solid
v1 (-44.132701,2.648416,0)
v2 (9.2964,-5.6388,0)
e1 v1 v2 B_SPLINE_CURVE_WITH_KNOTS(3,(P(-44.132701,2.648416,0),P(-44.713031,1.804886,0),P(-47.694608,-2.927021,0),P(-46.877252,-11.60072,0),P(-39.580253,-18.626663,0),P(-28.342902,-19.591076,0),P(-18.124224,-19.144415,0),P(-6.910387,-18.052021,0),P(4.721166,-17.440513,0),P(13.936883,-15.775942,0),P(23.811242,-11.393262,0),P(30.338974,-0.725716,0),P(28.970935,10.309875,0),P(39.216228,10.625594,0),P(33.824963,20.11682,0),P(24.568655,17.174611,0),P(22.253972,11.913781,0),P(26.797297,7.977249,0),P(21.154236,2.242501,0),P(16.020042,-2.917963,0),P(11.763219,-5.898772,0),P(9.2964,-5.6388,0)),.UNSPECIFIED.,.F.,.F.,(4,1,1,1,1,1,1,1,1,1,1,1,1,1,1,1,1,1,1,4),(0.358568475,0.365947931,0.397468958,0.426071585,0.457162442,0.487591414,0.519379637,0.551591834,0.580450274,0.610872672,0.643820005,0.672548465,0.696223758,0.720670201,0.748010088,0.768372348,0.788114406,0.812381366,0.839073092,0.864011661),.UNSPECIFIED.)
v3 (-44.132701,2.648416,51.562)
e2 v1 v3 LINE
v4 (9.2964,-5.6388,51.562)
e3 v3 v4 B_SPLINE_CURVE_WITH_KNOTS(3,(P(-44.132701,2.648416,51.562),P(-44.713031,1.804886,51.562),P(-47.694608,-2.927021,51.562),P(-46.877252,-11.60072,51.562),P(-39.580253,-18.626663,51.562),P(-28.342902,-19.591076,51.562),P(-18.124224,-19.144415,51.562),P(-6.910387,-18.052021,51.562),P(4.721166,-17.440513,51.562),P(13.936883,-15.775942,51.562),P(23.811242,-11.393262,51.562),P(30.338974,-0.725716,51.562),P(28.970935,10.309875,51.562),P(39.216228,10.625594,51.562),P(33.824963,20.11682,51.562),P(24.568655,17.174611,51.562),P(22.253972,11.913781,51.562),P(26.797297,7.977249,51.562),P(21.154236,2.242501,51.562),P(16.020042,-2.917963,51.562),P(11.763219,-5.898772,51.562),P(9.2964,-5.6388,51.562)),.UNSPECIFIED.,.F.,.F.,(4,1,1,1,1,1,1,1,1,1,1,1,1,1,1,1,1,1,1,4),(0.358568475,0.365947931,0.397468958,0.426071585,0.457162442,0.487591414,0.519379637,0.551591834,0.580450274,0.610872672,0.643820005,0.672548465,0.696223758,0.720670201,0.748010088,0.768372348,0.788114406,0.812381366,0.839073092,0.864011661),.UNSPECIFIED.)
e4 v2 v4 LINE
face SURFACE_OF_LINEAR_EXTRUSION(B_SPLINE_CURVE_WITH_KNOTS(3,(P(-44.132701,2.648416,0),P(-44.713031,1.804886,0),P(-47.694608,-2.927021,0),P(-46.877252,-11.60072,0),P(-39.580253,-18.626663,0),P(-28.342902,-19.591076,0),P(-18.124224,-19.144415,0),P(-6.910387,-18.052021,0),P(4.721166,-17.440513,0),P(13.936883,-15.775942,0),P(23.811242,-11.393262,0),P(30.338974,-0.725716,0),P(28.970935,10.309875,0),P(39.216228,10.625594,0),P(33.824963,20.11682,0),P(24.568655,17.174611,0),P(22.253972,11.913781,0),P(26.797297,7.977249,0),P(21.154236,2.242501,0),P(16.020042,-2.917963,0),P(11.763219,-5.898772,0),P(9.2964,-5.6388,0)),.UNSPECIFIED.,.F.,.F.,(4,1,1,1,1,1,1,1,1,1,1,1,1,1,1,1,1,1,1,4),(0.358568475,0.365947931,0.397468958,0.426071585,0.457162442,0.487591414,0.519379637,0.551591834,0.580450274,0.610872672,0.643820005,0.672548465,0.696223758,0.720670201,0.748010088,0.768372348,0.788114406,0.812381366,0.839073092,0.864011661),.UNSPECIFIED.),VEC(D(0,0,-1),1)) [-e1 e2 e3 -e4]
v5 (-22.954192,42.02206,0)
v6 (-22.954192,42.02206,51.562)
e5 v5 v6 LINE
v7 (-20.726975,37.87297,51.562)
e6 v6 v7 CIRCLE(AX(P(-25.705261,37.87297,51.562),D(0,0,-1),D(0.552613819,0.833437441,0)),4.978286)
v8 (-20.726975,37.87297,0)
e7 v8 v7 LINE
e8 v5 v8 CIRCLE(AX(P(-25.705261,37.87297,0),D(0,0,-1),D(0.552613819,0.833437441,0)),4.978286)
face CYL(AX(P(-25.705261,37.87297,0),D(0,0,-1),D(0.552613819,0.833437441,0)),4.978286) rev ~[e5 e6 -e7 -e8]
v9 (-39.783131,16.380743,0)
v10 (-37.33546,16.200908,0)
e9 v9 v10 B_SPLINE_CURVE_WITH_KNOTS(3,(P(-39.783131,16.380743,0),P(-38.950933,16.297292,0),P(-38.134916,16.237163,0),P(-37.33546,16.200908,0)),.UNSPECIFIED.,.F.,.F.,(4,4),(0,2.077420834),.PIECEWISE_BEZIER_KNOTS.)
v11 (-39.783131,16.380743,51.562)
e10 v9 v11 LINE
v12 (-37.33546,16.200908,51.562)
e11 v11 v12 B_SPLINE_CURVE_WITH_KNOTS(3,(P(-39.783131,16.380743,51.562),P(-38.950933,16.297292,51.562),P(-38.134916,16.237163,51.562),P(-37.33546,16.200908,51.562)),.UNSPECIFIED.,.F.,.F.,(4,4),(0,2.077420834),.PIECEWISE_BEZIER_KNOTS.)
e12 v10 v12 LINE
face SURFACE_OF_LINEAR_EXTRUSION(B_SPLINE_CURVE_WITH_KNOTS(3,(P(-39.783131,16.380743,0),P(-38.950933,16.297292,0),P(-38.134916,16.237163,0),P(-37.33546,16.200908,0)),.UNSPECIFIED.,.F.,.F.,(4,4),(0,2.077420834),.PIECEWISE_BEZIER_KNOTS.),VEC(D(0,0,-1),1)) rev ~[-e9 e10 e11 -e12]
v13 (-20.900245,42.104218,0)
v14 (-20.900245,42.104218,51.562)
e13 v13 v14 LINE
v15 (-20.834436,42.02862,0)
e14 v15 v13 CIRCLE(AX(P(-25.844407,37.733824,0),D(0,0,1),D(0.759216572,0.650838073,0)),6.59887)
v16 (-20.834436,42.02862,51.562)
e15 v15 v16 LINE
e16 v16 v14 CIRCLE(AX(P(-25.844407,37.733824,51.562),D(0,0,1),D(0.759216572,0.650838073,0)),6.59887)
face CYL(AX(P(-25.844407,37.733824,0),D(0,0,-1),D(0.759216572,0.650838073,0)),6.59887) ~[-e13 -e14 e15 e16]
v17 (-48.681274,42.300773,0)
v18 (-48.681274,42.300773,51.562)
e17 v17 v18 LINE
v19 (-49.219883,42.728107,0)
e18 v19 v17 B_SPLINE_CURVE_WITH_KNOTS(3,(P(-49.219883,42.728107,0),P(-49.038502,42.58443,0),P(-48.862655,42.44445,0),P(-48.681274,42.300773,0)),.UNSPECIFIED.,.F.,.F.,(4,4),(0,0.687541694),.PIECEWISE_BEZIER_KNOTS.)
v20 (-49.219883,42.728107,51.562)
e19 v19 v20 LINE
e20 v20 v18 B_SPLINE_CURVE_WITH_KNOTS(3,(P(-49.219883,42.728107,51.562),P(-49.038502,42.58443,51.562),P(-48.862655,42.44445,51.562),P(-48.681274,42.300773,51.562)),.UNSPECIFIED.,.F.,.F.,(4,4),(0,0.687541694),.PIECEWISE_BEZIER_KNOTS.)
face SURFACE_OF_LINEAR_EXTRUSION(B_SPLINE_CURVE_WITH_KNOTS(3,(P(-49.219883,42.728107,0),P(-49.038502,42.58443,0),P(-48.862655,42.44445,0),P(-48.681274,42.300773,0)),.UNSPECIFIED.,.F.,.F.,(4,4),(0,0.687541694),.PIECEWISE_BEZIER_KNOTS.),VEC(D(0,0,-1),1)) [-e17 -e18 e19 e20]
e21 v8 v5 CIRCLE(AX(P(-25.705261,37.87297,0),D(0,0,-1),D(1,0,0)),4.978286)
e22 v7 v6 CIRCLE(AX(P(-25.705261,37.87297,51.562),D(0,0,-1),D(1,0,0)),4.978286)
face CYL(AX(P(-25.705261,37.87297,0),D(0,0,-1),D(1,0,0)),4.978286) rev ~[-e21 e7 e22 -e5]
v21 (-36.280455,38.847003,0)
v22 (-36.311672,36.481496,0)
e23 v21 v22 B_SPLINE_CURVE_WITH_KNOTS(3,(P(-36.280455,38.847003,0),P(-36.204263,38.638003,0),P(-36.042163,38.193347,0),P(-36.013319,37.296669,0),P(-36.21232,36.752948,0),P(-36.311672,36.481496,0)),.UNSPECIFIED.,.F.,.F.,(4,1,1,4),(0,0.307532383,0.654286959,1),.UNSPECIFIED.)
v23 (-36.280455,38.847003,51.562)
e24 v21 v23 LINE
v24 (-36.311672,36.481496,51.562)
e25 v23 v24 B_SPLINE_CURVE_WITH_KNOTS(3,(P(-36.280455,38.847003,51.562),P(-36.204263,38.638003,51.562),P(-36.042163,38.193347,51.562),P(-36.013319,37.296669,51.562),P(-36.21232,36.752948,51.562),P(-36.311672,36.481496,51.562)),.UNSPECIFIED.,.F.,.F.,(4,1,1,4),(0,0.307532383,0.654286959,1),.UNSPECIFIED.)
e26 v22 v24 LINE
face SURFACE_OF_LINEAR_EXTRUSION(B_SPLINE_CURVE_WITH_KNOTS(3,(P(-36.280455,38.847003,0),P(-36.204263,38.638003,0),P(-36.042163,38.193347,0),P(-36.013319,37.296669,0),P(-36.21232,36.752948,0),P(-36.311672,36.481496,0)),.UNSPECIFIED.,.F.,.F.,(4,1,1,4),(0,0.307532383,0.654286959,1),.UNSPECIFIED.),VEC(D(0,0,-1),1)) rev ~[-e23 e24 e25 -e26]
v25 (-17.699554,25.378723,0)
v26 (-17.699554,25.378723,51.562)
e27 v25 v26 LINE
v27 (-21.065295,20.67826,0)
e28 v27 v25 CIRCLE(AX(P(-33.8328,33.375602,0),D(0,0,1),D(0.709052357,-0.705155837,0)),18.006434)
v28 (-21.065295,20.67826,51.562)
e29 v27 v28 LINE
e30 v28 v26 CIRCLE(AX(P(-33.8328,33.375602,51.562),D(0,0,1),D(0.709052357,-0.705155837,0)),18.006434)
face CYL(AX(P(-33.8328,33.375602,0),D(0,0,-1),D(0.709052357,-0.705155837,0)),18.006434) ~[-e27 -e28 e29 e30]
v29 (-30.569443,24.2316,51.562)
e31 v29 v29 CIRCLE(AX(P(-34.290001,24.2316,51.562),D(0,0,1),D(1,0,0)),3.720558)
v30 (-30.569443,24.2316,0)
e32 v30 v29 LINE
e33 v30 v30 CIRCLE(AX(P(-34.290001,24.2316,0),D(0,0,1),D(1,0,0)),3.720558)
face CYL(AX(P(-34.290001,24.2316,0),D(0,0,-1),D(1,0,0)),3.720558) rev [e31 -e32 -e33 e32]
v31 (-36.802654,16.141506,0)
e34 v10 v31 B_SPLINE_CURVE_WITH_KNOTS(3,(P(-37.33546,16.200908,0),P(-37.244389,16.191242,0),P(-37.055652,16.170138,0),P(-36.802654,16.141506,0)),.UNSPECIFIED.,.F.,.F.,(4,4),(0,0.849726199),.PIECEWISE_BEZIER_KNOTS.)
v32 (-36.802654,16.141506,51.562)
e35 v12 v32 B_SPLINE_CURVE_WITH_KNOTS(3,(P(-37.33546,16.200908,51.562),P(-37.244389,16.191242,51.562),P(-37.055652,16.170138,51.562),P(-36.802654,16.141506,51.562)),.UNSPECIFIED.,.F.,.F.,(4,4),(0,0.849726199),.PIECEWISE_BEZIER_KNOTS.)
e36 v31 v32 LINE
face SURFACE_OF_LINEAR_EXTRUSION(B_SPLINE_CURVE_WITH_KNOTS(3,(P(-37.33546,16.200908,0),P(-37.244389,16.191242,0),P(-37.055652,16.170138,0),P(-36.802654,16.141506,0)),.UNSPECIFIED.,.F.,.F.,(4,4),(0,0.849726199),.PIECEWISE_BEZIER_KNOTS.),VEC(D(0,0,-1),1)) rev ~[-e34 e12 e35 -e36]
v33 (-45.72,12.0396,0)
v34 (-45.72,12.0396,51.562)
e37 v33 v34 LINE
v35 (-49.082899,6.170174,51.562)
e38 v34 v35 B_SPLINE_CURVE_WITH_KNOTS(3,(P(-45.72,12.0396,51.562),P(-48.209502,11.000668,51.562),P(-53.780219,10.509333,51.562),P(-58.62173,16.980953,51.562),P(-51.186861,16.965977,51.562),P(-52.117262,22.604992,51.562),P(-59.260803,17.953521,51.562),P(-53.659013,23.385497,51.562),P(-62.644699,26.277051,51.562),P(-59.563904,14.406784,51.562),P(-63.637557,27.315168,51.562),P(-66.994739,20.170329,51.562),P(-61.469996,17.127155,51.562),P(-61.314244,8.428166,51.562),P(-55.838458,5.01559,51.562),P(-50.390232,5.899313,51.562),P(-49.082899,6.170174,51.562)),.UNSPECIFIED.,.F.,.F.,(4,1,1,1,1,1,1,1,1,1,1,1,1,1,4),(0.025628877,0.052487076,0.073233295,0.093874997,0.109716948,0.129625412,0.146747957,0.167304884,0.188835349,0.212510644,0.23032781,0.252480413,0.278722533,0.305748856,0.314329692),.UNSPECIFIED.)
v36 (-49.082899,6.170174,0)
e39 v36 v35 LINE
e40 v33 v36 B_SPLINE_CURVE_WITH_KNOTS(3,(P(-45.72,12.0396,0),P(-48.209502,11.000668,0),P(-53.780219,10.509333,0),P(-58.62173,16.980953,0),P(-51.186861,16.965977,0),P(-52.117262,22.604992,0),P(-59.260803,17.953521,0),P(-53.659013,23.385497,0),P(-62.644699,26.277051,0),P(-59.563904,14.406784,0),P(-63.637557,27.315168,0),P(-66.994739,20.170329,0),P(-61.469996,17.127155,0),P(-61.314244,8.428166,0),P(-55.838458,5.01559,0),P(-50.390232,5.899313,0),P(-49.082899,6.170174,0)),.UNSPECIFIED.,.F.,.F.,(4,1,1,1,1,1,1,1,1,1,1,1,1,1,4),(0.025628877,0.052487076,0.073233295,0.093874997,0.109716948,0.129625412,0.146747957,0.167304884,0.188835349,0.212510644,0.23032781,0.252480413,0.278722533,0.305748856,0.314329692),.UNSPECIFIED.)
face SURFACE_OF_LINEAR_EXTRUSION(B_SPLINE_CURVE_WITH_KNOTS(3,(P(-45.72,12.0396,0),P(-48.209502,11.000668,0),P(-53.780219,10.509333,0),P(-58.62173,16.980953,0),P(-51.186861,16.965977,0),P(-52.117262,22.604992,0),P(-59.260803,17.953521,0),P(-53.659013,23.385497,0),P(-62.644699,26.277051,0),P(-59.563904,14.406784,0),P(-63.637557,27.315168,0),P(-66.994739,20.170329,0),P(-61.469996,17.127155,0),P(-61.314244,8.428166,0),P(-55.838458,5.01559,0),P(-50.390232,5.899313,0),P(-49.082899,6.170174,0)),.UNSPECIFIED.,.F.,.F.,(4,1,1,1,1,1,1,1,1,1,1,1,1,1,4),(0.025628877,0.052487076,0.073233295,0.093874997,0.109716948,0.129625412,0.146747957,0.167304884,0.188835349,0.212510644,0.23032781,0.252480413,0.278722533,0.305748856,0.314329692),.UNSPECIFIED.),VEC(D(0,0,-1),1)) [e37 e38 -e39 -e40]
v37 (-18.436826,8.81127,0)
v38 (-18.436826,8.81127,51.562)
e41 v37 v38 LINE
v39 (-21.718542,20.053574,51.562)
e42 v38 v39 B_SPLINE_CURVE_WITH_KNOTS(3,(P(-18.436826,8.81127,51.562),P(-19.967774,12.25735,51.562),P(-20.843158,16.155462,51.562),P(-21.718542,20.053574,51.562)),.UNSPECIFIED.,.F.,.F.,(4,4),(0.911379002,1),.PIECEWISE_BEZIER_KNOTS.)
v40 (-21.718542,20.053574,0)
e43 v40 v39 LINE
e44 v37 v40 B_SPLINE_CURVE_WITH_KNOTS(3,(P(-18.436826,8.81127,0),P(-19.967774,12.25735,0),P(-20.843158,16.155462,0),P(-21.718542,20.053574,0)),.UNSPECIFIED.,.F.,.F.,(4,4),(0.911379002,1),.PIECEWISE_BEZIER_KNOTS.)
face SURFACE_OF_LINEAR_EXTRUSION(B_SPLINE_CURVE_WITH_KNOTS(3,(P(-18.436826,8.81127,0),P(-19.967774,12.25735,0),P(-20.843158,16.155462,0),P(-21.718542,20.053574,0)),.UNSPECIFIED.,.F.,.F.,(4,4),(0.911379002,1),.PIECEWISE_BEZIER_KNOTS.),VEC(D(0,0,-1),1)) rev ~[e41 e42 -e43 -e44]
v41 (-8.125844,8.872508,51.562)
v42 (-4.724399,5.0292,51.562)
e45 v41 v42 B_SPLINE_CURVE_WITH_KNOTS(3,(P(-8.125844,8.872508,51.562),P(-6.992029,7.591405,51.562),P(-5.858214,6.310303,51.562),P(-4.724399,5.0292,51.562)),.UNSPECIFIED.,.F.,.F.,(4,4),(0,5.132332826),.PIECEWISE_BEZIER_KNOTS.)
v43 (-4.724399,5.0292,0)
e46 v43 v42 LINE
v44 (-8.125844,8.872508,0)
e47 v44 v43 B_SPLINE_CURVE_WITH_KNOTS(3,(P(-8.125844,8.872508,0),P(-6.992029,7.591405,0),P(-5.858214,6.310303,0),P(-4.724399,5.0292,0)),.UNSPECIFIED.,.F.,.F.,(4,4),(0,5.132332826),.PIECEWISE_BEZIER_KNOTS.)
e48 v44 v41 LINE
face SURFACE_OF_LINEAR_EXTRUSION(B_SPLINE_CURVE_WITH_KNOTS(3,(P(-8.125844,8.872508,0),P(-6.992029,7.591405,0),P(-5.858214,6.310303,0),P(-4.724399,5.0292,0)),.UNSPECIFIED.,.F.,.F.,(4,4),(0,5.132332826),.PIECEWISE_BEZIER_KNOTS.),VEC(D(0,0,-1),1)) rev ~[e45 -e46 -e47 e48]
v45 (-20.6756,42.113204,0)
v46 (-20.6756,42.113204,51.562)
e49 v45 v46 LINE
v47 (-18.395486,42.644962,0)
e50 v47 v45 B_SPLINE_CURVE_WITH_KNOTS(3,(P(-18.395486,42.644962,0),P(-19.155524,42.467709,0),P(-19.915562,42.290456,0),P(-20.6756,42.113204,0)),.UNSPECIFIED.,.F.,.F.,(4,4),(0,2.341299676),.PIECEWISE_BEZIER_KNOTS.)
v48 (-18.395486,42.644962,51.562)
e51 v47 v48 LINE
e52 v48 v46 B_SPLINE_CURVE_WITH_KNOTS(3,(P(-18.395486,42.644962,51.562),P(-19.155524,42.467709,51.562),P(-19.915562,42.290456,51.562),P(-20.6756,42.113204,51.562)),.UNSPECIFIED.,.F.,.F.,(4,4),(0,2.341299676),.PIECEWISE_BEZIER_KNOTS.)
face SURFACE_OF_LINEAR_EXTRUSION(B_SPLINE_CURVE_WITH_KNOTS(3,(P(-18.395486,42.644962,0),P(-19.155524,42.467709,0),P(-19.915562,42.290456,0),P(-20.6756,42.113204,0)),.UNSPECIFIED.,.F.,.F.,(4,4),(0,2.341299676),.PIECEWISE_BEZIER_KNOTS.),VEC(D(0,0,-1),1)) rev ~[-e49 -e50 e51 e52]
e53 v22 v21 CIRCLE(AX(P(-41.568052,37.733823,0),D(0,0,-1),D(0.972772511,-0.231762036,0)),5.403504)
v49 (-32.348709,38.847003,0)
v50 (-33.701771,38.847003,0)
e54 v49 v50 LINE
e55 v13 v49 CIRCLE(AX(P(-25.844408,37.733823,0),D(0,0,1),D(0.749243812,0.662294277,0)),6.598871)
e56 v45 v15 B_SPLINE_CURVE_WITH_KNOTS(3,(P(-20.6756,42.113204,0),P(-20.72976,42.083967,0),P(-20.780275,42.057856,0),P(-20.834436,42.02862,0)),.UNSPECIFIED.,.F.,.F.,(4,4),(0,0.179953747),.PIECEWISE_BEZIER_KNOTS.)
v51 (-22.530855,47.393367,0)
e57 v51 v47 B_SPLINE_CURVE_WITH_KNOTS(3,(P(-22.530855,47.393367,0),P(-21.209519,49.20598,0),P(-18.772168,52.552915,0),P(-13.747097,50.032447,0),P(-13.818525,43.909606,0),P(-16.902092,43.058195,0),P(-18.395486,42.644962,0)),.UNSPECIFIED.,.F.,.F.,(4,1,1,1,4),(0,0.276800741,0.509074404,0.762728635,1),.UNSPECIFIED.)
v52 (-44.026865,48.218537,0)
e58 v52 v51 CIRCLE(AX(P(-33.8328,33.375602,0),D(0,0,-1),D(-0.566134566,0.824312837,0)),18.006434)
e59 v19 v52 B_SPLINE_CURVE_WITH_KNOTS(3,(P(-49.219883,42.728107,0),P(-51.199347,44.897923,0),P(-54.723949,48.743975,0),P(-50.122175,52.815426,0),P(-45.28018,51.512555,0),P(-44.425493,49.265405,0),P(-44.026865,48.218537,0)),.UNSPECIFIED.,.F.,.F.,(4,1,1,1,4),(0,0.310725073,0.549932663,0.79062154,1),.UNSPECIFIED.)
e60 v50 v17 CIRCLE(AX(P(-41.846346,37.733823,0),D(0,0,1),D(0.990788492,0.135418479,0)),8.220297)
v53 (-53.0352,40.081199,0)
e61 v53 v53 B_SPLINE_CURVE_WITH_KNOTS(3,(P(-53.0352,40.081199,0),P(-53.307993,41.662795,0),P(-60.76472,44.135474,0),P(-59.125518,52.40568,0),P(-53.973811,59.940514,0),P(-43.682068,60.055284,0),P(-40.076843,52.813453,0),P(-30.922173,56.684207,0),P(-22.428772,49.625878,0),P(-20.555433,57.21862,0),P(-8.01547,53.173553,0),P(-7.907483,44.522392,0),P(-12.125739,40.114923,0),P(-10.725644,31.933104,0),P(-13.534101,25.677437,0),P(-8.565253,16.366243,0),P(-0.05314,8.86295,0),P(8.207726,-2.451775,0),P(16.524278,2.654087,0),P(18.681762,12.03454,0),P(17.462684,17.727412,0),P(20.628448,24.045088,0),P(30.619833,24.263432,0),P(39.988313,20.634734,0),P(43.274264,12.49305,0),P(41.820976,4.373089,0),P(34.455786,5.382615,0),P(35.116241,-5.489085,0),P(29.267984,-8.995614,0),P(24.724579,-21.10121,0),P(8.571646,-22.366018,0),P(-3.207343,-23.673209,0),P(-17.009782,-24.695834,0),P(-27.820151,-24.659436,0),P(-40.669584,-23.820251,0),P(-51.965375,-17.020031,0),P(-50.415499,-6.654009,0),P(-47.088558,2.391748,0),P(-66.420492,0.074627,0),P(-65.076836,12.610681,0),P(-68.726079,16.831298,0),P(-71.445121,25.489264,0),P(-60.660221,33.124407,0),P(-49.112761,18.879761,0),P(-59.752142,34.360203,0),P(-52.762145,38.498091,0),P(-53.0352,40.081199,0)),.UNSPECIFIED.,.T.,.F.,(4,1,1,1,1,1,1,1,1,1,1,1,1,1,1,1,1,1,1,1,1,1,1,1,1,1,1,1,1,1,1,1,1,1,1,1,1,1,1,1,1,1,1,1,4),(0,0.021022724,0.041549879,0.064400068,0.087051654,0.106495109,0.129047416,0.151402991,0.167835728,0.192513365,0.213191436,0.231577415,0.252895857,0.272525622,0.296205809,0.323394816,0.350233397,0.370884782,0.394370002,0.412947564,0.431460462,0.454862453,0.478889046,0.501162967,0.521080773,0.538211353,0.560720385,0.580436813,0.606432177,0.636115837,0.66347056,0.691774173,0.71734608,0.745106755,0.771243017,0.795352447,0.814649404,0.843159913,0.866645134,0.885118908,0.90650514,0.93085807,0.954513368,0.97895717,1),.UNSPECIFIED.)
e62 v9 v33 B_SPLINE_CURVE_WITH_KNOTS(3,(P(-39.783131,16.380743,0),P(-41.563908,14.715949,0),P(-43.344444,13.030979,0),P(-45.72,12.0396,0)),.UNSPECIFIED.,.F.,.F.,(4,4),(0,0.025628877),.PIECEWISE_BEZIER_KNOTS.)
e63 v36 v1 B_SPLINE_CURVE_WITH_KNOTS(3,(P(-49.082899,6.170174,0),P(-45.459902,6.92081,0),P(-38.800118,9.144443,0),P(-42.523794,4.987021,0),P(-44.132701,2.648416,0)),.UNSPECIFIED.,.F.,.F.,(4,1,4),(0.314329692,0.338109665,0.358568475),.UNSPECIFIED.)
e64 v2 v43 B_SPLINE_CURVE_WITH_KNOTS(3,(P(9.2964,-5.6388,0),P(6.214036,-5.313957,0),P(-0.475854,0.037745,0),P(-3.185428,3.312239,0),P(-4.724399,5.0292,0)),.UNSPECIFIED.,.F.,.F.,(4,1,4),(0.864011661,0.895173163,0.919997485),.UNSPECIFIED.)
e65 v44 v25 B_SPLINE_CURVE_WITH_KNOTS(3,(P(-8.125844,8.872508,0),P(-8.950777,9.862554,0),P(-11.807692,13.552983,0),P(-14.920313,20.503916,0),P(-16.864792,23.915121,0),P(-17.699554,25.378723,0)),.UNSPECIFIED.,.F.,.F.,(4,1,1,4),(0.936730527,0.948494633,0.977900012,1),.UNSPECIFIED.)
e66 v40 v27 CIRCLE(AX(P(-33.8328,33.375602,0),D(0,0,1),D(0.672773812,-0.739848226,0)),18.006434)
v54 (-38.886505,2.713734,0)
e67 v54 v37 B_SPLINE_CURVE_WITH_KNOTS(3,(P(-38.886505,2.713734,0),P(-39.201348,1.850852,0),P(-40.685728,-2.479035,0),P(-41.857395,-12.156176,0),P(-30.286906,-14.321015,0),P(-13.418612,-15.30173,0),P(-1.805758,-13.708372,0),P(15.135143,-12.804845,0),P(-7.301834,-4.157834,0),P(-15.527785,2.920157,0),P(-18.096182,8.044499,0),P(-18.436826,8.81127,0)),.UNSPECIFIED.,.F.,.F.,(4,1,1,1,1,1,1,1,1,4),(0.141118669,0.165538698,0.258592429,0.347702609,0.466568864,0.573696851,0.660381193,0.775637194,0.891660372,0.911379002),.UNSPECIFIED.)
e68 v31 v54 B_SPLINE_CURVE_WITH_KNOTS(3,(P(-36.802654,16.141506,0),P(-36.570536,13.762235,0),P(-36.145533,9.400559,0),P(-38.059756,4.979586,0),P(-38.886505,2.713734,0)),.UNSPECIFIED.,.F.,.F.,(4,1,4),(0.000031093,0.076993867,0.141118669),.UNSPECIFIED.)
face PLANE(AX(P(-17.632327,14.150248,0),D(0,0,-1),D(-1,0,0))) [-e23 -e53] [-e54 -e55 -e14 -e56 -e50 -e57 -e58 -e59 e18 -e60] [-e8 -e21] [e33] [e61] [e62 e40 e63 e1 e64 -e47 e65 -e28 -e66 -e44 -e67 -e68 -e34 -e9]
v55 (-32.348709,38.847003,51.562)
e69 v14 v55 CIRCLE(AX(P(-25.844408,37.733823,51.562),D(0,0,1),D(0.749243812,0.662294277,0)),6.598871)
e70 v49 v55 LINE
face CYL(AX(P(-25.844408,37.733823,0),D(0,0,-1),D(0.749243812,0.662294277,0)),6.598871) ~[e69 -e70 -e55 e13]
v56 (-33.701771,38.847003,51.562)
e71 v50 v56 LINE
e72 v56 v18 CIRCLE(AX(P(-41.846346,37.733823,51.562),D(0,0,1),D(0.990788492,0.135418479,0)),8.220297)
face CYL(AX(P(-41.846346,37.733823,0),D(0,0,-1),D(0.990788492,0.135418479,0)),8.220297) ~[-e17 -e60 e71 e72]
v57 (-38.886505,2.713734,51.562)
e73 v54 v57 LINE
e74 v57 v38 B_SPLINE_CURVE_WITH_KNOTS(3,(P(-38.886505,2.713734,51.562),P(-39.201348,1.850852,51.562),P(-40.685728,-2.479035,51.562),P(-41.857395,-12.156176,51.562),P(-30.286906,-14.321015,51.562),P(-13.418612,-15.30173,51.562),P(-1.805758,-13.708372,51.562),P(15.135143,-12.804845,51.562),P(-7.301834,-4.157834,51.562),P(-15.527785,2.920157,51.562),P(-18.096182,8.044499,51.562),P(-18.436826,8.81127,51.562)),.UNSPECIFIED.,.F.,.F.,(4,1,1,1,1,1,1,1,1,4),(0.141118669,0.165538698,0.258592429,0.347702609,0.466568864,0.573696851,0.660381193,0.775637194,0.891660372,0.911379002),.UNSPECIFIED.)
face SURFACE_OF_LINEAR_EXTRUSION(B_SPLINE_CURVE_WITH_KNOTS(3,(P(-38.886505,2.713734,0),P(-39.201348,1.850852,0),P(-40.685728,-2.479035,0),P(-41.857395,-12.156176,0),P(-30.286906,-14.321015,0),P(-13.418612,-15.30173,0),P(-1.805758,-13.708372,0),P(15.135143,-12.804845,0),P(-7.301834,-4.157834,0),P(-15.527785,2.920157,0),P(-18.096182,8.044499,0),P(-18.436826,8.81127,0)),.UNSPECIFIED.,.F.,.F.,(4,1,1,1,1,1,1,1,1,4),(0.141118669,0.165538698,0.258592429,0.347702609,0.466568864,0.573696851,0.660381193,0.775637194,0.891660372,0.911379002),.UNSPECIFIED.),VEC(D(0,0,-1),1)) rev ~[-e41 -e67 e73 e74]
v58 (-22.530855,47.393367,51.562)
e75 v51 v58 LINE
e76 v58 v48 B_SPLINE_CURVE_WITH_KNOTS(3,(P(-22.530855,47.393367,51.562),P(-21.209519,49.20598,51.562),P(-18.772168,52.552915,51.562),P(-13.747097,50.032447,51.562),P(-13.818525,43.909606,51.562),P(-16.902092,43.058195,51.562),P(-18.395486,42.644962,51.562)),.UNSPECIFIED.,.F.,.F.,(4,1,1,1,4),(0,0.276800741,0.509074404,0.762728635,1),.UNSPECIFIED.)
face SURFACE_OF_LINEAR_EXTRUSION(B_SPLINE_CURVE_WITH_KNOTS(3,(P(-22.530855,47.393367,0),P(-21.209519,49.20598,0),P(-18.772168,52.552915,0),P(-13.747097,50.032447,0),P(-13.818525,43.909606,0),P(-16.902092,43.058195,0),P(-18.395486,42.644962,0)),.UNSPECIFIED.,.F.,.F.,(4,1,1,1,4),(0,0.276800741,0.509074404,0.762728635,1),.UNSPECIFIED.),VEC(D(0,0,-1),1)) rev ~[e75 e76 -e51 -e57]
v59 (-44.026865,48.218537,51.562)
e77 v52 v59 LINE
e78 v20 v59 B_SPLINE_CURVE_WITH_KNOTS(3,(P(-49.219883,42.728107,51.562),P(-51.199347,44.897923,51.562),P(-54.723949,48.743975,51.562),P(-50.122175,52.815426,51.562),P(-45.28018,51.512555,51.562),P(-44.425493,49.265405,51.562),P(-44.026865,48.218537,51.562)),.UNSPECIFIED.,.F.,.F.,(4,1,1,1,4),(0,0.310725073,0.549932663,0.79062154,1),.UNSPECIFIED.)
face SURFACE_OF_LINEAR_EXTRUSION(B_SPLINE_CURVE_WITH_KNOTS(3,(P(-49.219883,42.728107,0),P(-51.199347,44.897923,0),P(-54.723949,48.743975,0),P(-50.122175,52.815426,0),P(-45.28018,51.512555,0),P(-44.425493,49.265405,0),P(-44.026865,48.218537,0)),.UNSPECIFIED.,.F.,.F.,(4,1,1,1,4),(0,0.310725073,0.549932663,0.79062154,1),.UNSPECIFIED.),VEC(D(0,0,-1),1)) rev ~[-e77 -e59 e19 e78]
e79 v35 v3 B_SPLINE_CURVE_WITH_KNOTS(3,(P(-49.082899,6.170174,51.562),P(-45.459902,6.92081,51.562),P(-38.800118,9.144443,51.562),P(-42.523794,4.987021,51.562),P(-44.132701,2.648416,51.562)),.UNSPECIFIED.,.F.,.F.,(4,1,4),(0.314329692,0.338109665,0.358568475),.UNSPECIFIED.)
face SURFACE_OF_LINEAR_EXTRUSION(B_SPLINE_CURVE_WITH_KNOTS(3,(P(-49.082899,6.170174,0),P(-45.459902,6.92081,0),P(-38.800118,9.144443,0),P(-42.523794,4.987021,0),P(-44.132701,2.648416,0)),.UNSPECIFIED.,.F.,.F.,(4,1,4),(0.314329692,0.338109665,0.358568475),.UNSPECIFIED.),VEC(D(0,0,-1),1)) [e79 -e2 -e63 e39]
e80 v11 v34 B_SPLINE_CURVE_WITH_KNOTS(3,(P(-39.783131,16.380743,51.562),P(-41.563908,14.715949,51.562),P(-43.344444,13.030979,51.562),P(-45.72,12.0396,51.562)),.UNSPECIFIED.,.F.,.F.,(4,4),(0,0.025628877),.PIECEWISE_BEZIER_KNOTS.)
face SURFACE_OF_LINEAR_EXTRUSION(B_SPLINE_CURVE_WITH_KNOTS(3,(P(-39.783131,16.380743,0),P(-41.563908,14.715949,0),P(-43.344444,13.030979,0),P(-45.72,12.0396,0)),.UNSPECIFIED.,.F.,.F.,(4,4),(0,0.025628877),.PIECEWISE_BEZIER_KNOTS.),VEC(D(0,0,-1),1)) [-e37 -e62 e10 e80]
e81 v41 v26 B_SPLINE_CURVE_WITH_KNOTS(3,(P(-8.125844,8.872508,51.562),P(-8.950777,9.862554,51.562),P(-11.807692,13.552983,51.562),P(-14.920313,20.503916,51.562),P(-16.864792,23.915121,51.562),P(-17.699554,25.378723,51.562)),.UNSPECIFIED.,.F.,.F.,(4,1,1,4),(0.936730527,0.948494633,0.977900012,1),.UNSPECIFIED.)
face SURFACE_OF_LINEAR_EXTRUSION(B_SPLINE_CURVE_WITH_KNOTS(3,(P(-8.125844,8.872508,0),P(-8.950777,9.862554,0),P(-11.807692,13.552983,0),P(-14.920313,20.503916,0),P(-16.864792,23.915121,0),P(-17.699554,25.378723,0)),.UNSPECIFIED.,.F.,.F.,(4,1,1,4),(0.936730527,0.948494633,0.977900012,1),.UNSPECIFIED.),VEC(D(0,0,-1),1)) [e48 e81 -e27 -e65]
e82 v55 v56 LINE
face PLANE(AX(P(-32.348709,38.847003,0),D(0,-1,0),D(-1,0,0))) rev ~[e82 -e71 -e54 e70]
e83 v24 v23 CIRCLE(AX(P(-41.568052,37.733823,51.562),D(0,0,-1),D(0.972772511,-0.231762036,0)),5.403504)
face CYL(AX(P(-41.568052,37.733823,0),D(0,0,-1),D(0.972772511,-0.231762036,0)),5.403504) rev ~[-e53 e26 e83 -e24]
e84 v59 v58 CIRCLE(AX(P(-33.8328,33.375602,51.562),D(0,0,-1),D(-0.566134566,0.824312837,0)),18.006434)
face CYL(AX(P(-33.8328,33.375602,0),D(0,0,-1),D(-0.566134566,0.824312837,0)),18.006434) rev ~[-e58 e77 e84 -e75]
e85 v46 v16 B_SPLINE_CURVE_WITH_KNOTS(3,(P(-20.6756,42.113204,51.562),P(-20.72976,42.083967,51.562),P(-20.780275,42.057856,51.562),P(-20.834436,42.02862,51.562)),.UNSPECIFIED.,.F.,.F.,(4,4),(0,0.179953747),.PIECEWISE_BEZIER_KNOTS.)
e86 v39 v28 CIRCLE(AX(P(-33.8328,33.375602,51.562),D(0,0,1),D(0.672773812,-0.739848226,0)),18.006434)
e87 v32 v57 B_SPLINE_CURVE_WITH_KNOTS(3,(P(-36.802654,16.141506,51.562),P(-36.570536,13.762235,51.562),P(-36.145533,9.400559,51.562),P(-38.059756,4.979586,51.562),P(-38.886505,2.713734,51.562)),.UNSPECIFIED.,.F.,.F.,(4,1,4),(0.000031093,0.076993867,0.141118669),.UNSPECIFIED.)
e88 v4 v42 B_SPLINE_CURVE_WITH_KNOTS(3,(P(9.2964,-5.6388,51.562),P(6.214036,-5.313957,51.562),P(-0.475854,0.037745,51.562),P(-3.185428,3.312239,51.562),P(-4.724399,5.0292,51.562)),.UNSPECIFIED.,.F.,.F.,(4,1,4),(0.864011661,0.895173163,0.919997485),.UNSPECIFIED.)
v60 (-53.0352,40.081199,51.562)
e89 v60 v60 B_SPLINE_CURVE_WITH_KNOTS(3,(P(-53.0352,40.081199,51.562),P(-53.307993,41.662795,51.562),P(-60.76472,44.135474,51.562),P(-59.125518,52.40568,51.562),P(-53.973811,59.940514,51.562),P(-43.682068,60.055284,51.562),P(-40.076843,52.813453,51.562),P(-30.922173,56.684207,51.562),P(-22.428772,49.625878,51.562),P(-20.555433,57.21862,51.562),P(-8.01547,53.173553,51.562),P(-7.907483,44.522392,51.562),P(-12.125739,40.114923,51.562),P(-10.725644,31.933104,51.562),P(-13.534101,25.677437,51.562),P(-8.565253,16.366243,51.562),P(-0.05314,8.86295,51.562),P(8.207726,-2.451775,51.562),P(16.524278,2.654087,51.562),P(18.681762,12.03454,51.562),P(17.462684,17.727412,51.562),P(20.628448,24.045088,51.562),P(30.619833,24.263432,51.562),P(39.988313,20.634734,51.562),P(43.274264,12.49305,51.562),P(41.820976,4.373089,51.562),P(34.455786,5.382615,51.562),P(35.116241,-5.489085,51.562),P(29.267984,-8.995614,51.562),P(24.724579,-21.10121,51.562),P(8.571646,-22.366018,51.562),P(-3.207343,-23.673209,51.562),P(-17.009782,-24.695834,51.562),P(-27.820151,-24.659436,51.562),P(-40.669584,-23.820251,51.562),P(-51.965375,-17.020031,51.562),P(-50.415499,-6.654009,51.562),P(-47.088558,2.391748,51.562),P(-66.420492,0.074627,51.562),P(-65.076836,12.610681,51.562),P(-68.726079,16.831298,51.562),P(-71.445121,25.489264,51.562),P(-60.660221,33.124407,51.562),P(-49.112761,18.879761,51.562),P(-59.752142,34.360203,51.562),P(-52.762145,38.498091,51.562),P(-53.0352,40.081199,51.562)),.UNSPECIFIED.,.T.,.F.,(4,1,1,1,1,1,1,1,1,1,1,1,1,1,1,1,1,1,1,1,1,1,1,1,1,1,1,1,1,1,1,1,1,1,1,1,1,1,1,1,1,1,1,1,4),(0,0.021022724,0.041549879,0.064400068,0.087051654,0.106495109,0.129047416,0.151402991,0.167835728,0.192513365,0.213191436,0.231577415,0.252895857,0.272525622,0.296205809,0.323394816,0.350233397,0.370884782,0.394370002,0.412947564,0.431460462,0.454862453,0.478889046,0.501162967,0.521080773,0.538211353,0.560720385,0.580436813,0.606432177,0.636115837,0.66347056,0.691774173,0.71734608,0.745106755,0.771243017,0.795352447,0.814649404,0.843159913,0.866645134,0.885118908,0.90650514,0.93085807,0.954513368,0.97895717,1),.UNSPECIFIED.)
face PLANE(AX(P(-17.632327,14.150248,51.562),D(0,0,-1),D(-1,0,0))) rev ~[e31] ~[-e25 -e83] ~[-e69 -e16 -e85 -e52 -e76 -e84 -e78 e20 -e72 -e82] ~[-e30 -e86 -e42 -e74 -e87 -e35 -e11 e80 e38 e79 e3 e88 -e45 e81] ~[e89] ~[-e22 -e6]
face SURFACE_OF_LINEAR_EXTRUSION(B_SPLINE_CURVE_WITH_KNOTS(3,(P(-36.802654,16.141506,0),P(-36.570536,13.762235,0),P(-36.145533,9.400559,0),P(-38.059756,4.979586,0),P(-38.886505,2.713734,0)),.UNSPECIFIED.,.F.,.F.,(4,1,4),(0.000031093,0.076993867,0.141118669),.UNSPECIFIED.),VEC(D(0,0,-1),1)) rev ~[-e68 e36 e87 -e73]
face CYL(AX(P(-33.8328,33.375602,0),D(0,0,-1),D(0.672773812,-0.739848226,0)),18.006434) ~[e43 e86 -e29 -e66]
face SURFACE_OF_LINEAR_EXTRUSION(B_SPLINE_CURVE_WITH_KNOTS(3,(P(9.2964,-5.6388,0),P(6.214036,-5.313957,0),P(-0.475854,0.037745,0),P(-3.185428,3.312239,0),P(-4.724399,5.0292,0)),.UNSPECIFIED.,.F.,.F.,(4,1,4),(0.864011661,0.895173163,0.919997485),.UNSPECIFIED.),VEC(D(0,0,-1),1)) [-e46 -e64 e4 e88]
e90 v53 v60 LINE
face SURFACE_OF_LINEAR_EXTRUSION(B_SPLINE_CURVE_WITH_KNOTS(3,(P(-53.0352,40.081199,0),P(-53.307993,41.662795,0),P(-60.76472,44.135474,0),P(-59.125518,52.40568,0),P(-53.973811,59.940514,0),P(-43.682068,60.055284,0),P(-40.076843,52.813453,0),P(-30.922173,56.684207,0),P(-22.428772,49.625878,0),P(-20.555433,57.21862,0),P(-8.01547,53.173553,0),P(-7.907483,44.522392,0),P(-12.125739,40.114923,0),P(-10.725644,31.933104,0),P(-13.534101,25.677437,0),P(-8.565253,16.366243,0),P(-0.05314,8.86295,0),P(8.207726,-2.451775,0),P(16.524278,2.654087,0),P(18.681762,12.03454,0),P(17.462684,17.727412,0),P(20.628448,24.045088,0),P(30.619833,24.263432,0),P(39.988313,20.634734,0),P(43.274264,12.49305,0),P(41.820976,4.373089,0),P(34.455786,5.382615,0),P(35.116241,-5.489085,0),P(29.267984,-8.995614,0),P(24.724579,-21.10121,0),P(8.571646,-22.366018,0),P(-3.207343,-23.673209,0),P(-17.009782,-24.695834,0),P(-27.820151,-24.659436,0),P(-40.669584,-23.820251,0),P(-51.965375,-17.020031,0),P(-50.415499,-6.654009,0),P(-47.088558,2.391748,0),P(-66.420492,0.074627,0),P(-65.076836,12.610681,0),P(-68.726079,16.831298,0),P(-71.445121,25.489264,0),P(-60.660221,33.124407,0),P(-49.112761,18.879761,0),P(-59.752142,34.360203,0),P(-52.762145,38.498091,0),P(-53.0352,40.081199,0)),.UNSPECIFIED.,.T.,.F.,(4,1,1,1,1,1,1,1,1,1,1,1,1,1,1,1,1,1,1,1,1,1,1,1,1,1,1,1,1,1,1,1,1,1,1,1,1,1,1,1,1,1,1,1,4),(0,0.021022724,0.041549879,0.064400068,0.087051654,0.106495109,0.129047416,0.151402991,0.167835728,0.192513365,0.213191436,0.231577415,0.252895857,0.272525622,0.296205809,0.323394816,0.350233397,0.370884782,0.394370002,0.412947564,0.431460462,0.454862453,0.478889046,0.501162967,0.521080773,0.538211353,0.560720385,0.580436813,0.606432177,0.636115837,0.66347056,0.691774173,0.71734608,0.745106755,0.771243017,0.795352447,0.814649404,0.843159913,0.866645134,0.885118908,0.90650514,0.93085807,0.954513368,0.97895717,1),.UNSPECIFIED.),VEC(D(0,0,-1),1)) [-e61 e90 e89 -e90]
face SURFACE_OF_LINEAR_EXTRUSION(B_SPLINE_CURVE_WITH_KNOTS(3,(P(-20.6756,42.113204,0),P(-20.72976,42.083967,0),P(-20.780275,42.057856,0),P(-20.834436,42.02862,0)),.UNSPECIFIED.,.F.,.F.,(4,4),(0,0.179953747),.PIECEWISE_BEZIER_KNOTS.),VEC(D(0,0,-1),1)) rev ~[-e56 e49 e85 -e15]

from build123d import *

# Parameters (mm, degrees)
F0_R     = 3.7205580231
F1_DEPTH = 51.562


with BuildPart() as f1:
    # F0 (on Top) → F1 (new body)
    with BuildSketch(Plane.XY):
        with BuildLine():
            add(Edge.make_bspline(
                [(-53.0351996422, 40.0811992586), (-53.3079930687, 41.6627953679), (-60.7647197567, 44.1354743978), (-59.1255177726, 52.4056801186), (-53.9738105286, 59.9405136718), (-43.6820680314, 60.0552836973), (-40.0768432819, 52.8134528274), (-30.922173083, 56.6842073685), (-22.4287718601, 49.6258780063), (-20.555433276, 57.2186201881), (-8.0154700964, 53.1735527396), (-7.9074828777, 44.5223918176), (-12.1257390745, 40.114923321), (-10.7256442044, 31.933104297), (-13.5341011998, 25.6774370624), (-8.5652531319, 16.3662428058), (-0.0531398385, 8.862949751), (8.2077255005, -2.4517748861), (16.5242775456, 2.6540873778), (18.6817624376, 12.0345401673), (17.4626842494, 17.7274123298), (20.6284477431, 24.0450881696), (30.6198326835, 24.2634316934), (39.9883133501, 20.6347344654), (43.274263606, 12.4930502219), (41.8209757823, 4.373088916), (34.4557856792, 5.3826149304), (35.1162405235, -5.4890850104), (29.2679840475, -8.9956139239), (24.7245789247, -21.1012100778), (8.5716456517, -22.3660177487), (-3.2073427267, -23.673208758), (-17.0097819532, -24.6958343574), (-27.8201507989, -24.6594358256), (-40.6695843247, -23.820251083), (-51.9653752301, -17.0200309695), (-50.4154986842, -6.6540089959), (-47.0885578266, 2.3917477436), (-66.4204916011, 0.0746272617), (-65.0768362054, 12.6106814261), (-68.7260787409, 16.8312978332), (-71.4451206704, 25.4892643605), (-60.6602210105, 33.1244068312), (-49.112760512, 18.8797609199), (-59.7521417466, 34.36020266), (-52.7621453219, 38.4980905445), (-53.0351996422, 40.0811992586)],
                knots=[0, 0, 0, 0, 0.0210227239, 0.0415498789, 0.0644000682, 0.0870516541, 0.1064951093, 0.129047416, 0.1514029912, 0.1678357279, 0.1925133649, 0.2131914357, 0.2315774148, 0.2528958574, 0.2725256217, 0.2962058086, 0.3233948157, 0.3502333972, 0.3708847816, 0.3943700022, 0.4129475644, 0.4314604615, 0.4548624528, 0.4788890461, 0.5011629669, 0.5210807734, 0.5382113528, 0.5607203848, 0.5804368125, 0.606432177, 0.6361158369, 0.6634705602, 0.6917741726, 0.7173460798, 0.7451067546, 0.7712430171, 0.7953524467, 0.8146494037, 0.8431599135, 0.8666451338, 0.8851189078, 0.9065051395, 0.9308580695, 0.9545133683, 0.9789571704, 1, 1, 1, 1], degree=3))
        make_face()
        with BuildLine():
            add(Edge.make_bspline(
                [(-21.0652948492, 20.6782598491), (-21.670172812, 20.639156422), (-21.7699233734, 20.2162934835), (-21.7458119728, 20.0338150913)],
                knots=[0.8847102512, 0.8847102512, 0.8847102512, 0.8847102512, 0.9803485, 0.9803485, 0.9803485, 0.9803485], degree=3))
            ThreePointArc((-21.0652948492, 20.6782598491), (-19.1925492315, 22.8925325451), (-17.6995540947, 25.3787234554))
            add(Edge.make_bspline(
                [(-8.1258436749, 8.8725080124), (-8.9507770078, 9.8625538653), (-11.8076923951, 13.5529828734), (-14.9203133764, 20.5039164014), (-16.8647921862, 23.9151210734), (-17.6995540947, 25.3787234554)],
                knots=[0.936730527, 0.936730527, 0.936730527, 0.936730527, 0.948494633, 0.9779000116, 1, 1, 1, 1], degree=3))
            add(Edge.make_bspline(
                [(-8.1258436749, 8.8725080124), (-6.9920288455, 7.5914053785), (-5.8582140161, 6.3103027445), (-4.7243991867, 5.0292001106)],
                knots=[0, 0, 0, 0, 5.1323328258, 5.1323328258, 5.1323328258, 5.1323328258], degree=3))
            add(Edge.make_bspline(
                [(9.2964004725, -5.6388000958), (6.2140361423, -5.3139568809), (-0.4758535739, 0.0377445161), (-3.1854275389, 3.3122390614), (-4.7243991867, 5.0292001106)],
                knots=[0.8640116613, 0.8640116613, 0.8640116613, 0.8640116613, 0.8951731635, 0.9199974846, 0.9199974846, 0.9199974846, 0.9199974846], degree=3))
            add(Edge.make_bspline(
                [(-44.1327011496, 2.6484160648), (-44.7130309574, 1.8048856406), (-47.6946083402, -2.927021188), (-46.8772518965, -11.6007203583), (-39.5802529159, -18.6266633144), (-28.3429017795, -19.591076178), (-18.1242244322, -19.144415426), (-6.9103865804, -18.0520208922), (4.7211664853, -17.4405127728), (13.9368833116, -15.7759420728), (23.8112421331, -11.3932618369), (30.3389740044, -0.7257155667), (28.9709345734, 10.3098746354), (39.2162281551, 10.6255935235), (33.8249627001, 20.1168201293), (24.5686551298, 17.1746113113), (22.2539715483, 11.9137811577), (26.7972968019, 7.9772485427), (21.1542360401, 2.2425014104), (16.0200417627, -2.9179627405), (11.7632185561, -5.8987723219), (9.2964004725, -5.6388000958)],
                knots=[0.3585684754, 0.3585684754, 0.3585684754, 0.3585684754, 0.3659479306, 0.3974689583, 0.4260715846, 0.4571624421, 0.4875914142, 0.5193796367, 0.5515918337, 0.5804502736, 0.6108726721, 0.6438200053, 0.672548465, 0.6962237578, 0.7206702006, 0.748010088, 0.7683723479, 0.7881144061, 0.8123813661, 0.8390730918, 0.8640116613, 0.8640116613, 0.8640116613, 0.8640116613], degree=3))
            add(Edge.make_bspline(
                [(-49.0828990199, 6.1701741385), (-49.177863489, 4.040428207), (-47.197859123, 2.9614294526), (-44.13270115, 2.6484160654)],
                knots=[0.0841406615, 0.0841406615, 0.0841406615, 0.0841406615, 0.208246285, 0.208246285, 0.208246285, 0.208246285], degree=3))
            add(Edge.make_bspline(
                [(-45.71999982, 12.0395999402), (-48.2095024269, 11.0006678158), (-53.7802194274, 10.5093334281), (-58.6217302771, 16.9809530467), (-51.186861328, 16.9659773531), (-52.1172615159, 22.6049918831), (-59.260802502, 17.953520738), (-53.6590125511, 23.3854970332), (-62.6446993243, 26.277051321), (-59.5639044419, 14.4067842249), (-63.6375573492, 27.3151683753), (-66.9947393471, 20.1703294936), (-61.4699964034, 17.1271549744), (-61.3142437426, 8.4281658926), (-55.8384577489, 5.0155903157), (-50.3902321248, 5.8993125354), (-49.0828990199, 6.1701741385)],
                knots=[0.0256288773, 0.0256288773, 0.0256288773, 0.0256288773, 0.0524870758, 0.0732332952, 0.0938749966, 0.1097169476, 0.1296254117, 0.1467479568, 0.1673048843, 0.1888353489, 0.2125106443, 0.2303278097, 0.2524804134, 0.2787225334, 0.3057488565, 0.3143296922, 0.3143296922, 0.3143296922, 0.3143296922], degree=3))
            add(Edge.make_bspline(
                [(-39.7831306216, 16.380742902), (-41.56390775, 14.7159485647), (-43.3444437298, 13.0309793139), (-45.71999982, 12.0395999402)],
                knots=[0, 0, 0, 0, 0.0256288773, 0.0256288773, 0.0256288773, 0.0256288773], degree=3))
            add(Edge.make_bspline(
                [(-39.7831306216, 16.380742902), (-38.95093334, 16.2972918142), (-38.134915658, 16.2371630687), (-37.335459951, 16.2009078471)],
                knots=[0, 0, 0, 0, 2.0774208338, 2.0774208338, 2.0774208338, 2.0774208338], degree=3))
            add(Edge.make_bspline(
                [(-37.335459951, 16.2009078471), (-31.0549759584, 15.916088642), (-25.796629976, 17.1046466153), (-21.7458119642, 20.0338150896)],
                knots=[2.0774208338, 2.0774208338, 2.0774208338, 2.0774208338, 18.3975348551, 18.3975348551, 18.3975348551, 18.3975348551], degree=3))
        make_face(mode=Mode.SUBTRACT)
        with Locations((-34.2900007963, 24.2315996438)):
            Circle(F0_R, mode=Mode.SUBTRACT)
        with BuildLine():
            ThreePointArc((-36.3116717652, 36.4814959466), (-46.971085664, 37.8051259579), (-36.2804545776, 38.8470031321))
            add(Edge.make_bspline(
                [(-36.2804545776, 38.8470031321), (-36.2042632894, 38.638003094), (-36.0421633968, 38.1933474837), (-36.013318579, 37.2966688863), (-36.2123204756, 36.7529476575), (-36.3116717652, 36.4814959466)],
                knots=[0, 0, 0, 0, 0.307532383, 0.6542869592, 1, 1, 1, 1], degree=3))
        make_face(mode=Mode.SUBTRACT)
        with BuildLine():
            ThreePointArc((-20.7269751995, 37.8729701042), (-30.0915433108, 35.5184298259), (-22.954191543, 42.0220600103))
            ThreePointArc((-22.954191543, 42.0220600103), (-21.3189790012, 40.2275103826), (-20.7269751995, 37.8729701042))
        make_face(mode=Mode.SUBTRACT)
        with BuildLine():
            ThreePointArc((-33.7017707591, 38.8470031321), (-39.999476926, 45.7439636175), (-48.6812743523, 42.3007731858))
            add(Edge.make_bspline(
                [(-49.2198829041, 42.7281072575), (-49.0385020241, 42.5844299812), (-48.8626552323, 42.4444504621), (-48.6812743523, 42.3007731858)],
                knots=[0, 0, 0, 0, 0.687541694, 0.687541694, 0.687541694, 0.687541694], degree=3))
            add(Edge.make_bspline(
                [(-49.2198829041, 42.7281072575), (-51.19934658, 44.8979233113), (-54.7239489701, 48.7439745563), (-50.1221749988, 52.81542629), (-45.2801795053, 51.5125545977), (-44.4254927385, 49.2654049663), (-44.0268645913, 48.2185372916)],
                knots=[0, 0, 0, 0, 0.310725073, 0.5499326634, 0.79062154, 1, 1, 1, 1], degree=3))
            ThreePointArc((-44.0268645913, 48.2185372916), (-33.1420930224, 51.3687844299), (-22.5308552567, 47.3933671914))
            add(Edge.make_bspline(
                [(-22.5308552567, 47.3933671914), (-21.2095190932, 49.205980475), (-18.7721682592, 52.552915334), (-13.7470974395, 50.0324472001), (-13.8185248481, 43.9096057901), (-16.9020924696, 43.0581948555), (-18.3954862509, 42.6449623371)],
                knots=[0, 0, 0, 0, 0.2768007406, 0.5090744039, 0.7627286351, 1, 1, 1, 1], degree=3))
            add(Edge.make_bspline(
                [(-18.3954862509, 42.6449623371), (-19.1555240256, 42.4677094098), (-19.9155618003, 42.2904564826), (-20.675599575, 42.1132035553)],
                knots=[0, 0, 0, 0, 2.341299676, 2.341299676, 2.341299676, 2.341299676], degree=3))
            add(Edge.make_bspline(
                [(-20.675599575, 42.1132035553), (-20.7297600417, 42.0839673312), (-20.7802752843, 42.0578559737), (-20.8344357509, 42.0286197495)],
                knots=[0, 0, 0, 0, 0.1799537468, 0.1799537468, 0.1799537468, 0.1799537468], degree=3))
            ThreePointArc((-20.8344357509, 42.0286197495), (-20.8671966944, 42.0665437034), (-20.9002447034, 42.1042177634))
            ThreePointArc((-20.9002447034, 42.1042177634), (-27.6501958711, 44.0808092286), (-32.3487092883, 38.8470031321))
            Line((-32.3487092883, 38.8470031321), (-33.7017707591, 38.8470031321))
        make_face(mode=Mode.SUBTRACT)
        with BuildLine():
            add(Edge.make_bspline(
                [(-38.8865054324, 2.7137341923), (-39.2013483841, 1.8508518548), (-40.6857275806, -2.479034825), (-41.857395368, -12.156175759), (-30.2869064904, -14.3210148671), (-13.4186121607, -15.3017300236), (-1.8057579388, -13.7083720265), (15.1351427548, -12.8048451743), (-7.3018340252, -4.1578341465), (-15.5277854797, 2.920156624), (-18.0961822011, 8.0444989939), (-18.4368261233, 8.8112696576)],
                knots=[0.141118669, 0.141118669, 0.141118669, 0.141118669, 0.1655386981, 0.2585924292, 0.3477026087, 0.4665688636, 0.573696851, 0.6603811929, 0.7756371935, 0.8916603721, 0.9113790023, 0.9113790023, 0.9113790023, 0.9113790023], degree=3))
            add(Edge.make_bspline(
                [(-38.8865054322, 2.7137341917), (-32.1377612072, 3.3669214959), (-23.6097595892, 5.891801251), (-18.4368261233, 8.8112696576)],
                knots=[0.2698570737, 0.2698570737, 0.2698570737, 0.2698570737, 0.4846901848, 0.4846901848, 0.4846901848, 0.4846901848], degree=3))
        make_face()
        with BuildLine():
            add(Edge.make_bspline(
                [(-18.4368261233, 8.8112696576), (-19.9677744688, 12.2573498677), (-20.8431582774, 16.1554617481), (-21.718542086, 20.0535736285)],
                knots=[0.9113790023, 0.9113790023, 0.9113790023, 0.9113790023, 1, 1, 1, 1], degree=3))
            add(Edge.make_bspline(
                [(-21.7458119728, 20.0338150913), (-21.7456147196, 20.0323222517), (-21.7404521603, 19.9952311482), (-21.7301917205, 19.9685048959), (-21.718542086, 20.0535736285)],
                knots=[0.9803485, 0.9803485, 0.9803485, 0.9803485, 0.981130908, 1, 1, 1, 1], degree=3))
            add(Edge.make_bspline(
                [(-37.335459951, 16.2009078471), (-31.0549759584, 15.916088642), (-25.796629976, 17.1046466153), (-21.7458119642, 20.0338150896)],
                knots=[2.0774208338, 2.0774208338, 2.0774208338, 2.0774208338, 18.3975348551, 18.3975348551, 18.3975348551, 18.3975348551], degree=3))
            add(Edge.make_bspline(
                [(-37.335459951, 16.2009078471), (-37.2443888599, 16.1912422791), (-37.0556519801, 16.1701375357), (-36.8026544835, 16.1415062215)],
                knots=[0, 0, 0, 0, 0.8497261991, 0.8497261991, 0.8497261991, 0.8497261991], degree=3))
            add(Edge.make_bspline(
                [(-36.8026544977, 16.1415062173), (-36.5705358682, 13.7622348174), (-36.1455330702, 9.4005594138), (-38.0597561396, 4.9795856544), (-38.8865054324, 2.7137341923)],
                knots=[3.10934e-05, 3.10934e-05, 3.10934e-05, 3.10934e-05, 0.0769938675, 0.141118669, 0.141118669, 0.141118669, 0.141118669], degree=3))
            add(Edge.make_bspline(
                [(-38.8865054322, 2.7137341917), (-32.1377612072, 3.3669214959), (-23.6097595892, 5.891801251), (-18.4368261233, 8.8112696576)],
                knots=[0.2698570737, 0.2698570737, 0.2698570737, 0.2698570737, 0.4846901848, 0.4846901848, 0.4846901848, 0.4846901848], degree=3))
        make_face()
        with BuildLine():
            add(Edge.make_bspline(
                [(-49.0828990199, 6.1701741385), (-49.177863489, 4.040428207), (-47.197859123, 2.9614294526), (-44.13270115, 2.6484160654)],
                knots=[0.0841406615, 0.0841406615, 0.0841406615, 0.0841406615, 0.208246285, 0.208246285, 0.208246285, 0.208246285], degree=3))
            add(Edge.make_bspline(
                [(-49.0828990199, 6.1701741385), (-45.4599015722, 6.9208098354), (-38.8001175875, 9.1444431667), (-42.5237941185, 4.9870207894), (-44.1327011496, 2.6484160648)],
                knots=[0.3143296922, 0.3143296922, 0.3143296922, 0.3143296922, 0.3381096654, 0.3585684754, 0.3585684754, 0.3585684754, 0.3585684754], degree=3))
        make_face()
        with BuildLine():
            add(Edge.make_bspline(
                [(-21.7458119642, 20.0338150896), (-21.7367159155, 20.0403924917), (-21.7276259554, 20.0469786703), (-21.718542086, 20.0535736285)],
                knots=[18.3975348551, 18.3975348551, 18.3975348551, 18.3975348551, 18.4341814167, 18.4341814167, 18.4341814167, 18.4341814167], degree=3))
            ThreePointArc((-21.718542086, 20.0535736285), (-21.3879982127, 20.3618172476), (-21.0652948492, 20.6782598491))
            add(Edge.make_bspline(
                [(-21.0652948492, 20.6782598491), (-21.670172812, 20.639156422), (-21.7699233734, 20.2162934835), (-21.7458119728, 20.0338150913)],
                knots=[0.8847102512, 0.8847102512, 0.8847102512, 0.8847102512, 0.9803485, 0.9803485, 0.9803485, 0.9803485], degree=3))
        make_face()
        with BuildLine():
            add(Edge.make_bspline(
                [(-21.7458119728, 20.0338150913), (-21.7456147196, 20.0323222517), (-21.7404521603, 19.9952311482), (-21.7301917205, 19.9685048959), (-21.718542086, 20.0535736285)],
                knots=[0.9803485, 0.9803485, 0.9803485, 0.9803485, 0.981130908, 1, 1, 1, 1], degree=3))
            add(Edge.make_bspline(
                [(-21.7458119642, 20.0338150896), (-21.7367159155, 20.0403924917), (-21.7276259554, 20.0469786703), (-21.718542086, 20.0535736285)],
                knots=[18.3975348551, 18.3975348551, 18.3975348551, 18.3975348551, 18.4341814167, 18.4341814167, 18.4341814167, 18.4341814167], degree=3))
        make_face()
    extrude(amount=F1_DEPTH)


solid = f1.part
